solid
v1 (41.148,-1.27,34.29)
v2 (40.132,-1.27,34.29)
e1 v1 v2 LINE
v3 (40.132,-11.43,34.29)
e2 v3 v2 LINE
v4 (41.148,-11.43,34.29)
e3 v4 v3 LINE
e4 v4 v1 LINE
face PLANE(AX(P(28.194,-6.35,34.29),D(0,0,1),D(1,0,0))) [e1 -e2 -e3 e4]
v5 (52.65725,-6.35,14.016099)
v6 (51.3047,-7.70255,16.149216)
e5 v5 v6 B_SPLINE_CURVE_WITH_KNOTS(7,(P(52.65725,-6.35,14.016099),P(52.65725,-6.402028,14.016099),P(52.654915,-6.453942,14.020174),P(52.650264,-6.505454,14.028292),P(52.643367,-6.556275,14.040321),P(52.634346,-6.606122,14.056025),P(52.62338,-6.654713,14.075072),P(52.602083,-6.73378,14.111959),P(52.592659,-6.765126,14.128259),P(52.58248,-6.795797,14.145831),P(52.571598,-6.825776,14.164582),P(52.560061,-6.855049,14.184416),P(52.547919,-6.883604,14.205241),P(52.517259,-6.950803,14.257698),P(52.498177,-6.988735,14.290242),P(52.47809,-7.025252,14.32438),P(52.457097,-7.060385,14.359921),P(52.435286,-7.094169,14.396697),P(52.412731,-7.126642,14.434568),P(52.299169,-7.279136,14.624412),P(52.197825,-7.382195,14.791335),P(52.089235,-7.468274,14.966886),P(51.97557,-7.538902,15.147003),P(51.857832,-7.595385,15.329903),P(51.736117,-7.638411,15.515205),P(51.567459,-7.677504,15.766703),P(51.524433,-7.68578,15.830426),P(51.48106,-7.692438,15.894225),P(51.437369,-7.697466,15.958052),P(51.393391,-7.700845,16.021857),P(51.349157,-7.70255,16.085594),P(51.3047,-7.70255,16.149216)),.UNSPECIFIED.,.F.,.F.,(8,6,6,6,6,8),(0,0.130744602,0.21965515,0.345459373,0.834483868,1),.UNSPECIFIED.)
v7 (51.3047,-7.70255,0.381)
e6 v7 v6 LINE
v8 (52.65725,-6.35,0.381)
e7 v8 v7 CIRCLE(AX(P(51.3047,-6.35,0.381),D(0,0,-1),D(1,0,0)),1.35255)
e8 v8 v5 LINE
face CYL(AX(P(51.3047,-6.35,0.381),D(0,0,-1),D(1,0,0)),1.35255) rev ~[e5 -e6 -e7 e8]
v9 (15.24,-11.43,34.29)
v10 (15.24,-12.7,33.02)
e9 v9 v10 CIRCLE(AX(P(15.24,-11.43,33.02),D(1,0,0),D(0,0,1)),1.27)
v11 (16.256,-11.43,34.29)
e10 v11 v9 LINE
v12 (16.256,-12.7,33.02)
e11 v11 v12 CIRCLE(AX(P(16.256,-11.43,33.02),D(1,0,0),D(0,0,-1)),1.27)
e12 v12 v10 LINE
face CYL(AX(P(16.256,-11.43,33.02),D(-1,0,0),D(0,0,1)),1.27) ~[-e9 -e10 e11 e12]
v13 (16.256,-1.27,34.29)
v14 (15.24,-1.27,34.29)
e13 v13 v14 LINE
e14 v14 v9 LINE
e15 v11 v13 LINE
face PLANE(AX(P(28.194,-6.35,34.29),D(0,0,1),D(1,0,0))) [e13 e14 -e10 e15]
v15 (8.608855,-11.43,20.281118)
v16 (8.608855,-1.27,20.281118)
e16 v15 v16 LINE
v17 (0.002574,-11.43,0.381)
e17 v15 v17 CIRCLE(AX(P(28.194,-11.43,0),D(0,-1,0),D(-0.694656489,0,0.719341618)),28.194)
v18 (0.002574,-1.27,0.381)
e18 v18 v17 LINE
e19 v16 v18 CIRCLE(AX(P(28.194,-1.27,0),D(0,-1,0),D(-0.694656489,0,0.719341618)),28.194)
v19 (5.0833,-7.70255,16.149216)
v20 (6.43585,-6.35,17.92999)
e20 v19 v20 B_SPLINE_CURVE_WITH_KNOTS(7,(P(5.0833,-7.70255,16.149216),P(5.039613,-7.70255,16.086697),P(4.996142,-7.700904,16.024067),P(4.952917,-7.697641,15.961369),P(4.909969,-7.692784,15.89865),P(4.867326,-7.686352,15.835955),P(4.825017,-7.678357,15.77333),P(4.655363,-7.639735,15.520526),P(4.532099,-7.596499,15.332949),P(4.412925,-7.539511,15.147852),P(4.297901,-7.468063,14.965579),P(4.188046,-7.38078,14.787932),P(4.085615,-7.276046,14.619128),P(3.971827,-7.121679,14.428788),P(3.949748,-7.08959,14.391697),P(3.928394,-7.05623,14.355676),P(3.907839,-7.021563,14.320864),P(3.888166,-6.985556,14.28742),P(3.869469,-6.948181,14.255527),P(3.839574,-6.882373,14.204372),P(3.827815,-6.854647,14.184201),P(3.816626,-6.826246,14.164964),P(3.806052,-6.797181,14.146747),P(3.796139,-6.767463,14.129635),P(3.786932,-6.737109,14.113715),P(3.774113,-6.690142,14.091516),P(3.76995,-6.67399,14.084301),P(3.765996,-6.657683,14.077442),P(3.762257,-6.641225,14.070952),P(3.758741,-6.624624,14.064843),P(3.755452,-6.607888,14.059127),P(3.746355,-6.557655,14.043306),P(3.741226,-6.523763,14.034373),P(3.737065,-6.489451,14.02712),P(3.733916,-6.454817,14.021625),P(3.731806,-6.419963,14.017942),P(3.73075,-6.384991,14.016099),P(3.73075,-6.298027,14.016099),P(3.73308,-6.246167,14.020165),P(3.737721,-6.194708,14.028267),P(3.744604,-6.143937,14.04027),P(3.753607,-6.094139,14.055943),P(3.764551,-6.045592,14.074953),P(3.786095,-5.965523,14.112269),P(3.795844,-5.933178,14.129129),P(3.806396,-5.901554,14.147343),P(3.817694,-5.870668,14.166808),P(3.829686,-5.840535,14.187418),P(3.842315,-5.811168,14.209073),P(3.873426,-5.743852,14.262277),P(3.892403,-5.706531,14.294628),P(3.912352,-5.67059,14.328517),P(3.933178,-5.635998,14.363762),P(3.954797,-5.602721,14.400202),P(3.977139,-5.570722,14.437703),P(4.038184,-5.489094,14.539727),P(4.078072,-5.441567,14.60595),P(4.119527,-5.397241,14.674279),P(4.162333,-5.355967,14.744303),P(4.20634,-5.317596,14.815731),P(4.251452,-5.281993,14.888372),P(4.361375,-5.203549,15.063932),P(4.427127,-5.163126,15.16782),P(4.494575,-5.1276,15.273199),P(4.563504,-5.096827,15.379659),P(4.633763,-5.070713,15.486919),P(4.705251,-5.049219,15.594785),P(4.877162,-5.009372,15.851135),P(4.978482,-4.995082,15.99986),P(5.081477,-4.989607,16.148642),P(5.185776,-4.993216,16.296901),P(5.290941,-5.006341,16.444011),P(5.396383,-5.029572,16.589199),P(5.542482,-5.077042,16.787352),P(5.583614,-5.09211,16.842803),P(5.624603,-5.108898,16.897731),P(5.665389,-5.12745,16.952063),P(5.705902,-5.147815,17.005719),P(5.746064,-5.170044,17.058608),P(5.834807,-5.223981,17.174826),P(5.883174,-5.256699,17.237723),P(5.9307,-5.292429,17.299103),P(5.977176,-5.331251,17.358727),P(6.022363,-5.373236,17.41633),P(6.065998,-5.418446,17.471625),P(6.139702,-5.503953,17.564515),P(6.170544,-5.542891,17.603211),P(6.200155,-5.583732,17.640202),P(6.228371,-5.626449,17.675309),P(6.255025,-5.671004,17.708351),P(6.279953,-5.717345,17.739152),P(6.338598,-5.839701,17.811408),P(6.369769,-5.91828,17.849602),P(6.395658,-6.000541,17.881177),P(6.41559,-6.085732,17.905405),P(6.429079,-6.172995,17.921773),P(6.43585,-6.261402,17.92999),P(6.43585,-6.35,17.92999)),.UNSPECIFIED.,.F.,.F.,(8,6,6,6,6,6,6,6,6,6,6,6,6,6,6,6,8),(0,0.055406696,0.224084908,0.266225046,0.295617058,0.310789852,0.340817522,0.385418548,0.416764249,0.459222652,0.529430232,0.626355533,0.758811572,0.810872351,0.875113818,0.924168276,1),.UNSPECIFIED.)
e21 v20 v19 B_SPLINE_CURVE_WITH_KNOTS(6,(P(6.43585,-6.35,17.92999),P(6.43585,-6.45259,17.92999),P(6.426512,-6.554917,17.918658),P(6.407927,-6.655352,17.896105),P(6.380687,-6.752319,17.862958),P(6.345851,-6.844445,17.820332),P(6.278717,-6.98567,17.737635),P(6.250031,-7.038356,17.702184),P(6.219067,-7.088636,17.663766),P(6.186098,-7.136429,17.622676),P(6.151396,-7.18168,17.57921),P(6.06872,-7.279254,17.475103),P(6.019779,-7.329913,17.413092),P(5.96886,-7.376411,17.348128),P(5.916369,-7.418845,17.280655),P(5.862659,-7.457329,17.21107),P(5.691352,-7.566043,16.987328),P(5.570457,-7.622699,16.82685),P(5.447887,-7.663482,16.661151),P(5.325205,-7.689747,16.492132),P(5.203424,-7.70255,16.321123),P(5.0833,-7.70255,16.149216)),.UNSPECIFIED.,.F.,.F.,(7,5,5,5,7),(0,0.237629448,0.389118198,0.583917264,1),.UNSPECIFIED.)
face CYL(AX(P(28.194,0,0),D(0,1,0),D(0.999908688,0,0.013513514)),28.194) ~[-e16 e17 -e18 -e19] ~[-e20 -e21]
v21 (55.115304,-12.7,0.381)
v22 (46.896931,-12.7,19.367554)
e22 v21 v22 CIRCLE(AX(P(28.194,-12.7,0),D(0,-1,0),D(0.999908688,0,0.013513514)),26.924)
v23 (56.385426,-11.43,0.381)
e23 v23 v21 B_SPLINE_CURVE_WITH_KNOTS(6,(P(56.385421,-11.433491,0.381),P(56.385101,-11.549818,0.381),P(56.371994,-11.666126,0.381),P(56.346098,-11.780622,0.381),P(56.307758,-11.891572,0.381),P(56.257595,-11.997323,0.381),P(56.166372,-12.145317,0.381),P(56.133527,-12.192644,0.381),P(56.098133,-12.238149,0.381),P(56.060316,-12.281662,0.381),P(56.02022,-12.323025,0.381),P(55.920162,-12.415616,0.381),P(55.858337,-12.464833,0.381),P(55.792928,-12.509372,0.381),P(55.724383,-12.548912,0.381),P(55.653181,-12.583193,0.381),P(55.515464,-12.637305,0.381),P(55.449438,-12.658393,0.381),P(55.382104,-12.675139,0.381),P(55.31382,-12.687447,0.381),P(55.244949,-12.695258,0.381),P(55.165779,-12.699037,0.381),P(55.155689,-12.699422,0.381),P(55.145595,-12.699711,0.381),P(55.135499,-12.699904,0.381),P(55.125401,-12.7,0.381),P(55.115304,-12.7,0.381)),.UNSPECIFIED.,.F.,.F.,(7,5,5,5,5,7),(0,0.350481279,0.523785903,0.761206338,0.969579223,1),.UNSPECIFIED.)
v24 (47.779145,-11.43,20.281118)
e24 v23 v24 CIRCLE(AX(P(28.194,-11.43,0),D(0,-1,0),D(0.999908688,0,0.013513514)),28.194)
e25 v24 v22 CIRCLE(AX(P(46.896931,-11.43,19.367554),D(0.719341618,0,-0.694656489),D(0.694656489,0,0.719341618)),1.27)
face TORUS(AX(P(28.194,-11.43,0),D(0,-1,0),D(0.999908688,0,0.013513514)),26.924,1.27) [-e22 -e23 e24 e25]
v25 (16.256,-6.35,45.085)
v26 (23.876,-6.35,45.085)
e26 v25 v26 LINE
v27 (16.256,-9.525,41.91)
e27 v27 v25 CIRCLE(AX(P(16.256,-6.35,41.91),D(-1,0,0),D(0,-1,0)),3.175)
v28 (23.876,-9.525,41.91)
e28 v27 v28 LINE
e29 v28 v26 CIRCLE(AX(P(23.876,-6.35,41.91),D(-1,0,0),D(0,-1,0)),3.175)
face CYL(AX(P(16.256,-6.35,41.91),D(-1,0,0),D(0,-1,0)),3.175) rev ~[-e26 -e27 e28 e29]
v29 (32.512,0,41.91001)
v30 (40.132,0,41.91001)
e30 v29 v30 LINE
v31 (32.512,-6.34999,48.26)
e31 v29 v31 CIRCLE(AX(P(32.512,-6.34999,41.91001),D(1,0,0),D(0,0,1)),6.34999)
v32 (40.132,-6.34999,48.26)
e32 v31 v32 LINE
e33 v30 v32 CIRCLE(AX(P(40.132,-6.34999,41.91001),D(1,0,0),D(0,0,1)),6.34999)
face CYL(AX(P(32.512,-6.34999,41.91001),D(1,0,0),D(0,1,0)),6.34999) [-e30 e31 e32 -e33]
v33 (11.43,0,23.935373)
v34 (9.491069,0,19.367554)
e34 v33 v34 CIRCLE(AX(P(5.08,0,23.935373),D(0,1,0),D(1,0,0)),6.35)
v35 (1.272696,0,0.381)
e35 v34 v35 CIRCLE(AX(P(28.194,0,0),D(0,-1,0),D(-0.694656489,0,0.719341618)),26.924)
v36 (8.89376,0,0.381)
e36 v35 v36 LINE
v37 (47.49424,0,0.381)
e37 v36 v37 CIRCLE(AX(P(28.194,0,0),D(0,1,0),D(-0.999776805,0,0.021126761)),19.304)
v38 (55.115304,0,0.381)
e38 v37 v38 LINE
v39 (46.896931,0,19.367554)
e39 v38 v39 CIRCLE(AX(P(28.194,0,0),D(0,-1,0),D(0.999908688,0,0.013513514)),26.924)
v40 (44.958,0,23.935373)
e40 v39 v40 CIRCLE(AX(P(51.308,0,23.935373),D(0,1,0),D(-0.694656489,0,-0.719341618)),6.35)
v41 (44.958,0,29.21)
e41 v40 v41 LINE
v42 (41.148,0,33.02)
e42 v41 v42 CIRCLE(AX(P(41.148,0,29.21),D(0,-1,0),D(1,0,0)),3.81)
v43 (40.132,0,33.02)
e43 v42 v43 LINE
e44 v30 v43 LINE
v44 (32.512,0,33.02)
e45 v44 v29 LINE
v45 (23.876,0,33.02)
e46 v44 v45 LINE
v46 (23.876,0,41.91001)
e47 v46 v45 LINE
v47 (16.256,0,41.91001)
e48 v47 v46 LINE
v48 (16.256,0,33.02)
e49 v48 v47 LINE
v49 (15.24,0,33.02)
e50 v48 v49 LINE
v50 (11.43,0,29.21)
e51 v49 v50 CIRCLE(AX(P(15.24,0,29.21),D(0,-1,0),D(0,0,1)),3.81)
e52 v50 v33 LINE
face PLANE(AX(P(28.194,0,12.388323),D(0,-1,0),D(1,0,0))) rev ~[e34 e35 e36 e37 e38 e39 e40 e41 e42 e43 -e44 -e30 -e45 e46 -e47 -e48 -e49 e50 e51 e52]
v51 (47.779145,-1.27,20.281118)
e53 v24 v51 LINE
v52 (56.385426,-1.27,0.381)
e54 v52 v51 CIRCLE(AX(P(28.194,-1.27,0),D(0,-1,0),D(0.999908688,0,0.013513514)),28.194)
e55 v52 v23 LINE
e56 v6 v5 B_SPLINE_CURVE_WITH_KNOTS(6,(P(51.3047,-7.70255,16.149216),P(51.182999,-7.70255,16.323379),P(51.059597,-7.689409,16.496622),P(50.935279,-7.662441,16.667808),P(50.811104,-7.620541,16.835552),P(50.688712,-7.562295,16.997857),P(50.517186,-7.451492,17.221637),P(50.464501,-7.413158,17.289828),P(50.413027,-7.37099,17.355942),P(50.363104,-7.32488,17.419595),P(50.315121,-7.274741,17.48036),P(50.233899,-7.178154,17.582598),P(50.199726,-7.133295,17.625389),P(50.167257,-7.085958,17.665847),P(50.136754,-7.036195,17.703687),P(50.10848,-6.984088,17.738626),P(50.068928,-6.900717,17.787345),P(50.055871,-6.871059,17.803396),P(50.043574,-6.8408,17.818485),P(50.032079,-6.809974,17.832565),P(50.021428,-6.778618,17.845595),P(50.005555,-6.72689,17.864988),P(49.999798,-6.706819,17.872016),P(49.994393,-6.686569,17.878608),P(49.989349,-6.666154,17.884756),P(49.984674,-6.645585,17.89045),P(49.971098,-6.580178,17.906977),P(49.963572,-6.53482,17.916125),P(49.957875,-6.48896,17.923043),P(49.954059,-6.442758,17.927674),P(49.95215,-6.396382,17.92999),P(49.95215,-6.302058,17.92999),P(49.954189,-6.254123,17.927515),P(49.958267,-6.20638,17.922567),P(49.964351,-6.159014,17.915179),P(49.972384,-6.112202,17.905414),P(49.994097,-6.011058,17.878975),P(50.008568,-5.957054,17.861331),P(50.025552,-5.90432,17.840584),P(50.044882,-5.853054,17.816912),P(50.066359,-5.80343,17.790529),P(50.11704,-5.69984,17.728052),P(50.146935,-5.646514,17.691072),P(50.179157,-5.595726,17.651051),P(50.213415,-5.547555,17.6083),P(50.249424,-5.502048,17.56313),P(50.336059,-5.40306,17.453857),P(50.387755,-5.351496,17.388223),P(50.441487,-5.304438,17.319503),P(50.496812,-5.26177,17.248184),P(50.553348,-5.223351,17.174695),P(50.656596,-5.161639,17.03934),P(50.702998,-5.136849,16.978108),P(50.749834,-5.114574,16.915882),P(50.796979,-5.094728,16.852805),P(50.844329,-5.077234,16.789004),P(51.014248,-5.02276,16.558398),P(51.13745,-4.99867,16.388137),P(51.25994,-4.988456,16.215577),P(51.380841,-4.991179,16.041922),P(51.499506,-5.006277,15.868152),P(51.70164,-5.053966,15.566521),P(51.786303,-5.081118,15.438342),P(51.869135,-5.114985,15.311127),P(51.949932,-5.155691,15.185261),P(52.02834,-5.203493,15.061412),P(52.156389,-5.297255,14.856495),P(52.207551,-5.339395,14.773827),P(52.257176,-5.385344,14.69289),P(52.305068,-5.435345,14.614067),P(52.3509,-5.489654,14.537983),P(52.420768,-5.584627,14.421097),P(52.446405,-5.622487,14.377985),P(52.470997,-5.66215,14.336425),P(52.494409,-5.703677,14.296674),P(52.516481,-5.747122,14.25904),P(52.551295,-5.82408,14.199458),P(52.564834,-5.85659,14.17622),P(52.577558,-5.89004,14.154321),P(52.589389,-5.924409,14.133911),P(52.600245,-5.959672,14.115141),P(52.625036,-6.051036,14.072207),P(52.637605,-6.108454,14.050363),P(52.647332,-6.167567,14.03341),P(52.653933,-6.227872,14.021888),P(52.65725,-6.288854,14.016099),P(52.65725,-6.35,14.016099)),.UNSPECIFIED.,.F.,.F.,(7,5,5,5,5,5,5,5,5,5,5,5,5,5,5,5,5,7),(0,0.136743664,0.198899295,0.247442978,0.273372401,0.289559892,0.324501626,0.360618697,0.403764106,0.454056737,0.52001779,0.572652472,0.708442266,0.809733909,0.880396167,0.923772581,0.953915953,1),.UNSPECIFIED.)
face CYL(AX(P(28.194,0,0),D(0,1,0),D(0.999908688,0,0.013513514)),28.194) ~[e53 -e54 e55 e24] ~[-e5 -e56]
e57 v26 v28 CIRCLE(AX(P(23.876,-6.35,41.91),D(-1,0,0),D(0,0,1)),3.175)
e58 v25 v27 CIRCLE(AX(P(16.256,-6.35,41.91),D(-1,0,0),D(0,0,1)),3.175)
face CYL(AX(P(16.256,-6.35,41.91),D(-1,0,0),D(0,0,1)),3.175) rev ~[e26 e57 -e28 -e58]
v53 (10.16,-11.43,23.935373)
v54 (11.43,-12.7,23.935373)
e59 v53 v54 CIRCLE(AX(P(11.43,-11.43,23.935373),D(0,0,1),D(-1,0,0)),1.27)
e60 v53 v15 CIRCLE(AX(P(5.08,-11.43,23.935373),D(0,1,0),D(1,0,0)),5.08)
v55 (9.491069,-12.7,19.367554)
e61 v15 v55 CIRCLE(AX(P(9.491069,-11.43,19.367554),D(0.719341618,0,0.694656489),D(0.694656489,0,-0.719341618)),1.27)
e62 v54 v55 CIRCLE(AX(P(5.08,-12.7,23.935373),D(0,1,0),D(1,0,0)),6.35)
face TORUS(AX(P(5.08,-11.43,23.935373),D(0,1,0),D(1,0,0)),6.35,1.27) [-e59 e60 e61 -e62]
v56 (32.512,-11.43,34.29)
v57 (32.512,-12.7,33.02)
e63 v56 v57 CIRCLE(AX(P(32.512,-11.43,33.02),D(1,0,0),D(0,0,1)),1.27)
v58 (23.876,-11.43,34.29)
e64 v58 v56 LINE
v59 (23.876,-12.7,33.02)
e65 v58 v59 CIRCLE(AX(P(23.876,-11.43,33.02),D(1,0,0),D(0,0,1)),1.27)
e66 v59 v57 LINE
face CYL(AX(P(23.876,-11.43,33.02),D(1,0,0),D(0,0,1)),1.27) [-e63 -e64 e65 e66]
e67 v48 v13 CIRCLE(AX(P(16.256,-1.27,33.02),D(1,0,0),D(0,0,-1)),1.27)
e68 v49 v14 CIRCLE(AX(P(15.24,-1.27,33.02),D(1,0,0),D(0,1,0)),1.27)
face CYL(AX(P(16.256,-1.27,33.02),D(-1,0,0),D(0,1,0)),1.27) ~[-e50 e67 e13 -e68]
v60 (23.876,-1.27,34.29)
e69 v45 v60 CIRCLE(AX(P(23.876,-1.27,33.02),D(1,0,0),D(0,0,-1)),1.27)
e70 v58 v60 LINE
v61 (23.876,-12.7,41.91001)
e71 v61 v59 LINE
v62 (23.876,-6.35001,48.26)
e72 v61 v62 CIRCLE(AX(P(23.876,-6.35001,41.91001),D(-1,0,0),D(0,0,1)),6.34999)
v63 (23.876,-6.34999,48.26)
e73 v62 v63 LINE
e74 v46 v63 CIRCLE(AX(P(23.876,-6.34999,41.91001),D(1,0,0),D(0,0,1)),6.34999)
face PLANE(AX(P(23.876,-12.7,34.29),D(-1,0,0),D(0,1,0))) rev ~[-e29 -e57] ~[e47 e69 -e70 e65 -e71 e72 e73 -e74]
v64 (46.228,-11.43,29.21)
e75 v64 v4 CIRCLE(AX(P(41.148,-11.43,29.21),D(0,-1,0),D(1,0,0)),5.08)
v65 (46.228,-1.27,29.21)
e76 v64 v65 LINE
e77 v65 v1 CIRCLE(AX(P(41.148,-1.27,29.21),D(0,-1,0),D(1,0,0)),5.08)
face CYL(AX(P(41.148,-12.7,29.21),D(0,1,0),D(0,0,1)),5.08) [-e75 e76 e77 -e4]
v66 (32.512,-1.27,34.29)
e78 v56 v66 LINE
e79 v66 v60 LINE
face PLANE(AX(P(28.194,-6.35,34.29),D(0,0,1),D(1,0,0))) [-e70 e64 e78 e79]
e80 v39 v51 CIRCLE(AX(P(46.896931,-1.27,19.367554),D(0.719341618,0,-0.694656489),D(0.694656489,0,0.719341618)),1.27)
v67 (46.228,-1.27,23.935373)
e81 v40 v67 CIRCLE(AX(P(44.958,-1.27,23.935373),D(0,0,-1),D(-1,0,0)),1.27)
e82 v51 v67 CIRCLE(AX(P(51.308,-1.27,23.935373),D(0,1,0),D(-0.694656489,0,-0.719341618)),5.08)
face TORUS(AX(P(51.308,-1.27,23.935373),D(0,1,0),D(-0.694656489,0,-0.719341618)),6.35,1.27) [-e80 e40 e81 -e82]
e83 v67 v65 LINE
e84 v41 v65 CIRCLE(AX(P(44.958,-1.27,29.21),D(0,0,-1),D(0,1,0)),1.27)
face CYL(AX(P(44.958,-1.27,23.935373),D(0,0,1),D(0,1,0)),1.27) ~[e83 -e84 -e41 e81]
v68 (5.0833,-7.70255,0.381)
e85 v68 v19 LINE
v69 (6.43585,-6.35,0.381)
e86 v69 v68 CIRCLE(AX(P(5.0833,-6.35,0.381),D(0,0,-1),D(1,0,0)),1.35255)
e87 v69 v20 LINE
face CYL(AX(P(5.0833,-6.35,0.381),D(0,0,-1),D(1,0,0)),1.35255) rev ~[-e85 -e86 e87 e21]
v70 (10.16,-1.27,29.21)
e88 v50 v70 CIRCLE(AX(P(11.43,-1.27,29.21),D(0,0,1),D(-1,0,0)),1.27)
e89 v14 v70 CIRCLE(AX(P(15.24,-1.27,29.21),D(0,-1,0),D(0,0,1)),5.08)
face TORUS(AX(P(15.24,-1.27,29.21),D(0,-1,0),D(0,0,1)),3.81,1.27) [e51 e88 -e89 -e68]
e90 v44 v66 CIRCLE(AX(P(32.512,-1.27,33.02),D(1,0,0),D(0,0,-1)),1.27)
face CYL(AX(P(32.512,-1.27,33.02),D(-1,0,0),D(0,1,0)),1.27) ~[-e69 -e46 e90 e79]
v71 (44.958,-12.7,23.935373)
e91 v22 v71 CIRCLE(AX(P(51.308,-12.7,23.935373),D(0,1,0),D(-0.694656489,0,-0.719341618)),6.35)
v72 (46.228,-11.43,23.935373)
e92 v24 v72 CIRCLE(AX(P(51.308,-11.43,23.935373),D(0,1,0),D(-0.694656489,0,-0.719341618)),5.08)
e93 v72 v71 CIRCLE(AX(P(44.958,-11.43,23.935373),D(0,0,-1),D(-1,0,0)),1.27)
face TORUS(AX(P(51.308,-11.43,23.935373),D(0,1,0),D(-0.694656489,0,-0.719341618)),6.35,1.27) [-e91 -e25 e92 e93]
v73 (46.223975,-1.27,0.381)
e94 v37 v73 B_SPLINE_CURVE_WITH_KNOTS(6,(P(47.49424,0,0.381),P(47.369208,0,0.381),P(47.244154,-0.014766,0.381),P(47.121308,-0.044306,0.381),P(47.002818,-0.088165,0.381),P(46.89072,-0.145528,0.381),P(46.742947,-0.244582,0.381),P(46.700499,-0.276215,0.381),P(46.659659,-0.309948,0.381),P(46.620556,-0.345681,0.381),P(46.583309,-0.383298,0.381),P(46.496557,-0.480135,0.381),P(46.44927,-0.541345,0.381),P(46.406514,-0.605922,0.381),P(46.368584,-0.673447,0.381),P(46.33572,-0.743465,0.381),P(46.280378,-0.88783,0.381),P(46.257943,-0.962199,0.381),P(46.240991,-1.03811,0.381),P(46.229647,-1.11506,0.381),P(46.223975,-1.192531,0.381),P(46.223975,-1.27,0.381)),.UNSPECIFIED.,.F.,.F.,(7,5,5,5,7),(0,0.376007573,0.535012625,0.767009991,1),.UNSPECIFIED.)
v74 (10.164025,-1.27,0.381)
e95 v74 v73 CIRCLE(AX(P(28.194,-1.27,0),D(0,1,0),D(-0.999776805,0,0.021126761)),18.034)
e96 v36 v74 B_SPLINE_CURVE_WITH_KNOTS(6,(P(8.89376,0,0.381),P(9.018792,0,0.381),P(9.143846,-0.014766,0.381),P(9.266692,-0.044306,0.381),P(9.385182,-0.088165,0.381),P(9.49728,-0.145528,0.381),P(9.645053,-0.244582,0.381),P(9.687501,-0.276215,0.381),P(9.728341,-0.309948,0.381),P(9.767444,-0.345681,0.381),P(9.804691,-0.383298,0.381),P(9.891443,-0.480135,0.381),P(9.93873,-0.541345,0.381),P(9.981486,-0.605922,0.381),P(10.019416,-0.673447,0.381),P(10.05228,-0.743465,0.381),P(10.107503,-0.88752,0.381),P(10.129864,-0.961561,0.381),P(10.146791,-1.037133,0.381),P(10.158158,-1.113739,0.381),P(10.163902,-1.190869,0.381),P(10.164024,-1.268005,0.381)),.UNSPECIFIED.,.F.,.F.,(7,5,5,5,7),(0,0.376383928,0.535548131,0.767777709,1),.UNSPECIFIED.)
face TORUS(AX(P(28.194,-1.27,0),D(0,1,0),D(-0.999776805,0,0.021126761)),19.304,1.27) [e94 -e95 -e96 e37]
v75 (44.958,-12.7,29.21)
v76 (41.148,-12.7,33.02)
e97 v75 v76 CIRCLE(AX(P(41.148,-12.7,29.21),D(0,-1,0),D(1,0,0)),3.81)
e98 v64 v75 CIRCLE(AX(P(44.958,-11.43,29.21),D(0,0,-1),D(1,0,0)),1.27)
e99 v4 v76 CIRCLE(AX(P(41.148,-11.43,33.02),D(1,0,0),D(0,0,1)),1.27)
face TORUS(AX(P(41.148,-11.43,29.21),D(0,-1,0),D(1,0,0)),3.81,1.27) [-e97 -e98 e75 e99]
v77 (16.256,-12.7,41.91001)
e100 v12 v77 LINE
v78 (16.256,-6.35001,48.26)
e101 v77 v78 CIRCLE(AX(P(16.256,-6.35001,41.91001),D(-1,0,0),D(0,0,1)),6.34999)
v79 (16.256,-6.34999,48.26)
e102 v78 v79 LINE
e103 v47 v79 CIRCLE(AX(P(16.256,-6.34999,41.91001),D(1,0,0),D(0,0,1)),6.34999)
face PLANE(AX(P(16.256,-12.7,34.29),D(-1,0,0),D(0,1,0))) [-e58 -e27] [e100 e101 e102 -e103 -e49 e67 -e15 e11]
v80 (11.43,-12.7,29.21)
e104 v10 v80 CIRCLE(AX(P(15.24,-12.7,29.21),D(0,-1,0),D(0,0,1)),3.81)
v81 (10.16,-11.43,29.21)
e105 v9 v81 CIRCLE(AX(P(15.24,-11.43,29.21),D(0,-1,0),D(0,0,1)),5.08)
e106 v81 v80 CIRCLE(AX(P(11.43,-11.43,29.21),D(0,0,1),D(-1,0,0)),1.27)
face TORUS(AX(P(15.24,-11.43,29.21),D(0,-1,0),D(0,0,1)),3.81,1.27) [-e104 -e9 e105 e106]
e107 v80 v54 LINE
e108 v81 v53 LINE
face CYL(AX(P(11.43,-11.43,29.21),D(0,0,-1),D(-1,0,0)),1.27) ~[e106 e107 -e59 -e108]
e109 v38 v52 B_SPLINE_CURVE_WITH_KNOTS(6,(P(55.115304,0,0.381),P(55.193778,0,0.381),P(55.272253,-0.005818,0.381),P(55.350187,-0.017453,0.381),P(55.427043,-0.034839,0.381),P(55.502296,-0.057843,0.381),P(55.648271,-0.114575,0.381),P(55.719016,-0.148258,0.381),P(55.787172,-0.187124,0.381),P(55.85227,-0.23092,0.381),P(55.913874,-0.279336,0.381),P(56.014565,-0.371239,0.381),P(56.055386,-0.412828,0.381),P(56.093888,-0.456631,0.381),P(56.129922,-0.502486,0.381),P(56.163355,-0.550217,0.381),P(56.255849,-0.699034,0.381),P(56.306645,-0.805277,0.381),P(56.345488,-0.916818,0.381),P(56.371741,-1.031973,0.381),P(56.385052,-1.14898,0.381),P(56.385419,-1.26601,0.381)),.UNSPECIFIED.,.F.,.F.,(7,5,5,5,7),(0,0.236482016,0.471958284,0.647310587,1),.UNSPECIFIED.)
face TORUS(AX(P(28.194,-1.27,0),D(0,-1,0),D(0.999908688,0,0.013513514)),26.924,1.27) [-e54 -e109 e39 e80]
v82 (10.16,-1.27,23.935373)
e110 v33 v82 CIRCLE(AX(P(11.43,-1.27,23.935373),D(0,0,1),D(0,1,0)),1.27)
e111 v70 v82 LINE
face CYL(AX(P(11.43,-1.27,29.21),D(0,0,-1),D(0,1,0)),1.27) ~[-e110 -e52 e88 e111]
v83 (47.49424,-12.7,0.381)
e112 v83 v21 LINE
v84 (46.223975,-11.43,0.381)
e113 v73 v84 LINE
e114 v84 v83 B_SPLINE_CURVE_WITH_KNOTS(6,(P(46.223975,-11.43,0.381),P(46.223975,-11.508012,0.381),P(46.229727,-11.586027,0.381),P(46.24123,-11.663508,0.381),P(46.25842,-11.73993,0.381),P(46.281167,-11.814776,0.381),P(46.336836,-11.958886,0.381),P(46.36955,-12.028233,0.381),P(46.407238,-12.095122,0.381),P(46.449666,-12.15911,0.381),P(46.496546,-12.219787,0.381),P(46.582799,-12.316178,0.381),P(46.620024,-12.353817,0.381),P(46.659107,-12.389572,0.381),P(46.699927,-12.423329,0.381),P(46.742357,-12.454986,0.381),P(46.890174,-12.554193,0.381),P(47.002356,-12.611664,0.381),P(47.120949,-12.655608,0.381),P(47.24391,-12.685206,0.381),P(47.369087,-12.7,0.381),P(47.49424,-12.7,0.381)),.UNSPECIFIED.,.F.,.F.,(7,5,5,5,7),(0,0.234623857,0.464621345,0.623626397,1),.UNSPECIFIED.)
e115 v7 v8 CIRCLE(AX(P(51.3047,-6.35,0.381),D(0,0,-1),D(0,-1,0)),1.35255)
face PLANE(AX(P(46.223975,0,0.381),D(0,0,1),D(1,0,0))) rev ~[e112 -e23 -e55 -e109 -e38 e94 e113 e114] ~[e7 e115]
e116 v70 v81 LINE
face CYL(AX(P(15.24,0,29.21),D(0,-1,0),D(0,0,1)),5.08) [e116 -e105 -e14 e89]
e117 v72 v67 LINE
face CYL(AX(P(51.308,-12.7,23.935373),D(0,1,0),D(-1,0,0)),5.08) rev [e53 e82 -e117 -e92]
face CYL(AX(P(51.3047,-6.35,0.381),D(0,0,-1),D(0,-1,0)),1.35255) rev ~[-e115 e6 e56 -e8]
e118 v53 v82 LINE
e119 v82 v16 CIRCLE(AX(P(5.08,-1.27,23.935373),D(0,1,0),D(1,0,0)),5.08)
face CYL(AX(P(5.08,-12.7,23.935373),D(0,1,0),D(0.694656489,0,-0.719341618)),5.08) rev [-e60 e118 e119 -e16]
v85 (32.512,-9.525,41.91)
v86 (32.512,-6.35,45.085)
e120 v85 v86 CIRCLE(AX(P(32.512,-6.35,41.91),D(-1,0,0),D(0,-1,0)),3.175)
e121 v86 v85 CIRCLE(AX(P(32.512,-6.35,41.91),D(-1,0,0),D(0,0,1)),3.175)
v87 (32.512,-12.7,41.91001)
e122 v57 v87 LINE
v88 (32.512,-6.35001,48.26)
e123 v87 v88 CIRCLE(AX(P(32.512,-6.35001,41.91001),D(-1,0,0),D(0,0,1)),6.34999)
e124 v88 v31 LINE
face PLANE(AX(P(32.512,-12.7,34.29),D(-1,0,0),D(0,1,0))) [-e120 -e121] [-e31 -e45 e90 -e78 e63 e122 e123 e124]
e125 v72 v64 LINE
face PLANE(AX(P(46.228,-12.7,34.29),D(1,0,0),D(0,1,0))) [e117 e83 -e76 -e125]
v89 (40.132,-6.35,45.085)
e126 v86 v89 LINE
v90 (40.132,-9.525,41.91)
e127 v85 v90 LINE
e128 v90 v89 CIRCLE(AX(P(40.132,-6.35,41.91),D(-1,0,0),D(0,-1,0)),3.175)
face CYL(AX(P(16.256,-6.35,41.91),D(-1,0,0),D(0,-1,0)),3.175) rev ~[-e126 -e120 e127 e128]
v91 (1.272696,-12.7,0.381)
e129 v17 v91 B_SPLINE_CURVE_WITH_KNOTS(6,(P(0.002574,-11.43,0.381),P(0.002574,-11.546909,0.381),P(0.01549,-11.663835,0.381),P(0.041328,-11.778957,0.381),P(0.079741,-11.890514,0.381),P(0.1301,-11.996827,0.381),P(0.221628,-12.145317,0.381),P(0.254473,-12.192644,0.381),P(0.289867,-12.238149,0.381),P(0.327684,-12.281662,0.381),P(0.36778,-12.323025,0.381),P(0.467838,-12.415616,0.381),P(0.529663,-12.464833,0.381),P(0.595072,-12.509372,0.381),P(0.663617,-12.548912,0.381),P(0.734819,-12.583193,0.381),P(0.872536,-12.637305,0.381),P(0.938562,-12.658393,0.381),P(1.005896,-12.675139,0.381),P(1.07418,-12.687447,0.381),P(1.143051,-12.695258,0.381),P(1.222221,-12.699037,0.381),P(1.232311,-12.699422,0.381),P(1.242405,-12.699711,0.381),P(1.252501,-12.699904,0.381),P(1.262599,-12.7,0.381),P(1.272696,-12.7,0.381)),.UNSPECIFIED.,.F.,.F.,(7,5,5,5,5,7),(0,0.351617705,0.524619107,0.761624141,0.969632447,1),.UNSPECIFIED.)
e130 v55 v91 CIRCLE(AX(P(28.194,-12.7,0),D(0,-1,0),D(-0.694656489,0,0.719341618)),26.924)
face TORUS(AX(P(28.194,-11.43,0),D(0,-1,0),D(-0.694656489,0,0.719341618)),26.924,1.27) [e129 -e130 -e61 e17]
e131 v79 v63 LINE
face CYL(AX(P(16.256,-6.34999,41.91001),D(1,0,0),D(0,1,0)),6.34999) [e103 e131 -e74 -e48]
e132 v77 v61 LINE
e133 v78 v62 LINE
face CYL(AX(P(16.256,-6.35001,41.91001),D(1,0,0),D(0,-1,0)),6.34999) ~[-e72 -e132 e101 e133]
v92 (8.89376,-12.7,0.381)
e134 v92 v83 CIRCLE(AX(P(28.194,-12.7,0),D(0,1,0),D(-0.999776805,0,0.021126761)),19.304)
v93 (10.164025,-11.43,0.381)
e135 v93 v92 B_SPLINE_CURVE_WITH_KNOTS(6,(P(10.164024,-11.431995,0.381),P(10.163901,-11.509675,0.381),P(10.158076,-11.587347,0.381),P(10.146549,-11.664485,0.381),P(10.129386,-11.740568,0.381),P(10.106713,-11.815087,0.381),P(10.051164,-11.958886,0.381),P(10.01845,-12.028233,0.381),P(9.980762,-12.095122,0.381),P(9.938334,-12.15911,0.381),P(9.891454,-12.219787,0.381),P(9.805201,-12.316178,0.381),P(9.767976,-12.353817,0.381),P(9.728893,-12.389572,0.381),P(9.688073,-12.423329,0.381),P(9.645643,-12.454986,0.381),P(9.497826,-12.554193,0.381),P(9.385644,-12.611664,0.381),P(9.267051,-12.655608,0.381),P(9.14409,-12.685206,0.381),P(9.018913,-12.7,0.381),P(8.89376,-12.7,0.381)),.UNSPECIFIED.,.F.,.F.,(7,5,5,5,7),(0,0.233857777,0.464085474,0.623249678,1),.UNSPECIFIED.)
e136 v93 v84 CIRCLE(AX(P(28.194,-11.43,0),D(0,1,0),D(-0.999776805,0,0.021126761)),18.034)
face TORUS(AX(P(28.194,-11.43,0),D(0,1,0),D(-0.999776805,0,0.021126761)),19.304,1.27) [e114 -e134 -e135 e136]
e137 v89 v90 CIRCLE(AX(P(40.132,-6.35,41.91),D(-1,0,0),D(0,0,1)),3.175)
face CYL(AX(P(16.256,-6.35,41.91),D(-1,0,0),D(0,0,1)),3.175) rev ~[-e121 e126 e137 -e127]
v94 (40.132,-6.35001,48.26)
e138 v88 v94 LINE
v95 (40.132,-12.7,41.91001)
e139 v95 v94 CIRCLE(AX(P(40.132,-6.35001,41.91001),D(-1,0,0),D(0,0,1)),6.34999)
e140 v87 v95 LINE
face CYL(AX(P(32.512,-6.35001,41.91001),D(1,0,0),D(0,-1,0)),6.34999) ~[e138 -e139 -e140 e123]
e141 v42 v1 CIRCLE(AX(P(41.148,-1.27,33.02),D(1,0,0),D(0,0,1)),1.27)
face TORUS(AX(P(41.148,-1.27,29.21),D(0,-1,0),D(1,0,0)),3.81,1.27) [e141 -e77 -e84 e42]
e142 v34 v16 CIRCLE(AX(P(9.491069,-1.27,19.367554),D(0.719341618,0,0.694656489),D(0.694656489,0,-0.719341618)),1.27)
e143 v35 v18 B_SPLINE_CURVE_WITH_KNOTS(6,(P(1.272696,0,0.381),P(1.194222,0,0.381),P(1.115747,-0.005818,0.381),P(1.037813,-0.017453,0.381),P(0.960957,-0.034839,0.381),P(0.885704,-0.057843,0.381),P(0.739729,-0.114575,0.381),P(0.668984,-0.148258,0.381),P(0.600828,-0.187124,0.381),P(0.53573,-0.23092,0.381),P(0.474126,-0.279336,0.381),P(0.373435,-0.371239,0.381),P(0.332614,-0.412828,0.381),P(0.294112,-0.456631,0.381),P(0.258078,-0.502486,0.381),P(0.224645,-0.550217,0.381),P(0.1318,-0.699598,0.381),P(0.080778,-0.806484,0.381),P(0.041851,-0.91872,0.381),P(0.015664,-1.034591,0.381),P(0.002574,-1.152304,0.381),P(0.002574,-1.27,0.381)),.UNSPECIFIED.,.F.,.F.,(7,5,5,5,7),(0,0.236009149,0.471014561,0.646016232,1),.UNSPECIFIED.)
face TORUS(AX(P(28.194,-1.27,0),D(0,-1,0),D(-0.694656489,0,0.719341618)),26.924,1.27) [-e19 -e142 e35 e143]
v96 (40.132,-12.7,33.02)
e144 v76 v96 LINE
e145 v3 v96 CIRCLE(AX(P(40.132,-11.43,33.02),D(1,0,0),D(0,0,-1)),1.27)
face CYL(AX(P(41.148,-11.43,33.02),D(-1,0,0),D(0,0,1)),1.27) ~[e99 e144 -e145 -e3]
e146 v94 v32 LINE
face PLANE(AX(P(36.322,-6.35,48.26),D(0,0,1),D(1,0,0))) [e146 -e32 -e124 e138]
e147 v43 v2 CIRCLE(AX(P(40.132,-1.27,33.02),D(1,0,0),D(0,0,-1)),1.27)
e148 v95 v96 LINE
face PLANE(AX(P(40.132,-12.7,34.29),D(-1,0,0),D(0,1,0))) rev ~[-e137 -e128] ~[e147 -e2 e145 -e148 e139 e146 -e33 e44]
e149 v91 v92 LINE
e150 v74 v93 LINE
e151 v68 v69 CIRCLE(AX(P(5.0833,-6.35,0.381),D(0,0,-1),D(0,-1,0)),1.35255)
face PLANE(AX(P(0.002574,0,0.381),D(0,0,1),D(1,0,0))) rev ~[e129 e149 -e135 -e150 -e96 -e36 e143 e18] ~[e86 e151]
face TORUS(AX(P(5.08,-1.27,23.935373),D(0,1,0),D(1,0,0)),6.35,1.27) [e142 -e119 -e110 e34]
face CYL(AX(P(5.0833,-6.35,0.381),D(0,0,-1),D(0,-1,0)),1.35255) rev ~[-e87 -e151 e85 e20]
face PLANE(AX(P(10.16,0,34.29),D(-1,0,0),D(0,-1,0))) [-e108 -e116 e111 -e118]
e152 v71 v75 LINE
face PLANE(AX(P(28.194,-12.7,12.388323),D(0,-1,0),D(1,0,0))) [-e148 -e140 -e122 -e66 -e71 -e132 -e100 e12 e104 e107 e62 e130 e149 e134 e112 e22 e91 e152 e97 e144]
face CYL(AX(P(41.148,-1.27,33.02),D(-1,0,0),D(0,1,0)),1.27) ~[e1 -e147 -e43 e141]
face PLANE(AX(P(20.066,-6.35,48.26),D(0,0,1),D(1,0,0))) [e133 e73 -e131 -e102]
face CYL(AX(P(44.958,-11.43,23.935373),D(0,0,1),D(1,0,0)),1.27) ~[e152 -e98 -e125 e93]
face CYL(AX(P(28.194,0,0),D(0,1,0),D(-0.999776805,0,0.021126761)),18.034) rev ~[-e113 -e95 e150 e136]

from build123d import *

# Parameters (mm, degrees)
F1_DEPTH  = 12.7
F5_W      = 7.62
F5_H      = 12.7
F6_DEPTH  = 13.97
F8_DEPTH  = 23.876
F9_R      = 6.34999
F10_R     = 5.08
F12_DEPTH = 18.5489899089
F14_DEPTH = 18.5489899089
F15_R     = 1.27


# Not quite as in the source:
# - a fillet or chamfer is up to 0.001 mm smaller than in the source, because OpenCascade refuses the exact size


with BuildPart() as f1:
    # F0 (on Front) → F1 (new body)
    with BuildSketch(Plane.XZ):
        with BuildLine():
            ThreePointArc((56.3854255581, 0.381), (28.194, 28.194), (0.0025744419, 0.381))
            Line((0.0025744419, 0.381), (10.1640250971, 0.381))
            ThreePointArc((10.1640250971, 0.381), (28.194, 18.034), (46.2239749029, 0.381))
            Line((46.2239749029, 0.381), (56.3854255581, 0.381))
        make_face()
    extrude(amount=F1_DEPTH)

    # F3 (on offset) → F4 (join, up to the next surface of F1)
    with BuildSketch(Plane.XY.offset(34.29)):
        Polygon((28.194, 0), (10.16, 0), (10.16, -12.7), (46.228, -12.7), (46.228, 0), align=None)
    extrude(until=Until.NEXT, dir=(0, 0, -1))

    # F5 (on face) → F6 (join)
    with BuildSketch(Plane.XY.offset(34.29)):
        with Locations((20.066, -6.35)):
            Rectangle(F5_W, F5_H)
        with Locations((36.322, -6.35)):
            Rectangle(F5_W, F5_H)
    extrude(amount=F6_DEPTH)

    # F7 (on face) → F8 (cut, through all)
    with BuildSketch(Plane(origin=(16.256, 0, 0), x_dir=(0, -1, 0), z_dir=(-1, 0, 0))):
        with BuildLine():
            ThreePointArc((9.525, 41.91), (8.5950640303, 44.1550640303), (6.35, 45.085))
            ThreePointArc((6.35, 45.085), (4.1049359697, 39.6649359697), (9.525, 41.91))
        make_face()
    extrude(amount=-F8_DEPTH, mode=Mode.SUBTRACT)

    # F9 (radius 6.35 in the source; OpenCascade refuses exactly that, so slightly less here)
    f9_edges = [f1.edges().sort_by_distance(p)[0] for p in [
        (20.066, -12.7, 48.26),
        (20.066, 0, 48.26),
        (36.322, -12.7, 48.26),
        (36.322, 0, 48.26),
    ]]
    fillet(f9_edges, radius=F9_R)

    # F10
    f10_edges = [f1.edges().sort_by_distance(p)[0] for p in [
        (10.16, -6.35, 34.29),
        (10.16, -6.35, 21.672021),
        (46.228, -6.35, 34.29),
        (46.228, -6.35, 21.672021),
    ]]
    fillet(f10_edges, radius=F10_R)

    # F11 (on face) → F12 (cut, up to face)
    with BuildSketch(Plane(origin=(0, 0, 0.381), x_dir=(1, 0, 0), z_dir=(0, 0, -1))):
        with BuildLine():
            ThreePointArc((52.6572502305, 6.35), (52.2610975074, 7.3063972769), (51.3047002305, 7.70255))
            ThreePointArc((51.3047002305, 7.70255), (50.3483029536, 5.3936027231), (52.6572502305, 6.35))
        make_face()
    extrude(amount=-F12_DEPTH, mode=Mode.SUBTRACT)

    # F13 (on face) → F14 (cut, up to face)
    with BuildSketch(Plane(origin=(0, 0, 0.381), x_dir=(1, 0, 0), z_dir=(0, 0, -1))):
        with BuildLine():
            ThreePointArc((6.4358497695, 6.35), (6.0396970464, 7.3063972769), (5.0832997695, 7.70255))
            ThreePointArc((5.0832997695, 7.70255), (4.1269024926, 5.3936027231), (6.4358497695, 6.35))
        make_face()
    extrude(amount=-F14_DEPTH, mode=Mode.SUBTRACT)

    # F15
    f15_edges = [f1.edges().sort_by_distance(p)[0] for p in [
        (28.194, 0, 18.034),
        (2.316329, 0, 11.191416),
        (2.316329, -12.7, 11.191416),
        (28.194, -12.7, 18.034),
        (54.071671, -12.7, 11.191416),
        (54.071671, 0, 11.191416),
        (28.194, 0, 34.29),
        (28.194, -12.7, 34.29),
    ]]
    fillet(f15_edges, radius=F15_R)


solid = f1.part
